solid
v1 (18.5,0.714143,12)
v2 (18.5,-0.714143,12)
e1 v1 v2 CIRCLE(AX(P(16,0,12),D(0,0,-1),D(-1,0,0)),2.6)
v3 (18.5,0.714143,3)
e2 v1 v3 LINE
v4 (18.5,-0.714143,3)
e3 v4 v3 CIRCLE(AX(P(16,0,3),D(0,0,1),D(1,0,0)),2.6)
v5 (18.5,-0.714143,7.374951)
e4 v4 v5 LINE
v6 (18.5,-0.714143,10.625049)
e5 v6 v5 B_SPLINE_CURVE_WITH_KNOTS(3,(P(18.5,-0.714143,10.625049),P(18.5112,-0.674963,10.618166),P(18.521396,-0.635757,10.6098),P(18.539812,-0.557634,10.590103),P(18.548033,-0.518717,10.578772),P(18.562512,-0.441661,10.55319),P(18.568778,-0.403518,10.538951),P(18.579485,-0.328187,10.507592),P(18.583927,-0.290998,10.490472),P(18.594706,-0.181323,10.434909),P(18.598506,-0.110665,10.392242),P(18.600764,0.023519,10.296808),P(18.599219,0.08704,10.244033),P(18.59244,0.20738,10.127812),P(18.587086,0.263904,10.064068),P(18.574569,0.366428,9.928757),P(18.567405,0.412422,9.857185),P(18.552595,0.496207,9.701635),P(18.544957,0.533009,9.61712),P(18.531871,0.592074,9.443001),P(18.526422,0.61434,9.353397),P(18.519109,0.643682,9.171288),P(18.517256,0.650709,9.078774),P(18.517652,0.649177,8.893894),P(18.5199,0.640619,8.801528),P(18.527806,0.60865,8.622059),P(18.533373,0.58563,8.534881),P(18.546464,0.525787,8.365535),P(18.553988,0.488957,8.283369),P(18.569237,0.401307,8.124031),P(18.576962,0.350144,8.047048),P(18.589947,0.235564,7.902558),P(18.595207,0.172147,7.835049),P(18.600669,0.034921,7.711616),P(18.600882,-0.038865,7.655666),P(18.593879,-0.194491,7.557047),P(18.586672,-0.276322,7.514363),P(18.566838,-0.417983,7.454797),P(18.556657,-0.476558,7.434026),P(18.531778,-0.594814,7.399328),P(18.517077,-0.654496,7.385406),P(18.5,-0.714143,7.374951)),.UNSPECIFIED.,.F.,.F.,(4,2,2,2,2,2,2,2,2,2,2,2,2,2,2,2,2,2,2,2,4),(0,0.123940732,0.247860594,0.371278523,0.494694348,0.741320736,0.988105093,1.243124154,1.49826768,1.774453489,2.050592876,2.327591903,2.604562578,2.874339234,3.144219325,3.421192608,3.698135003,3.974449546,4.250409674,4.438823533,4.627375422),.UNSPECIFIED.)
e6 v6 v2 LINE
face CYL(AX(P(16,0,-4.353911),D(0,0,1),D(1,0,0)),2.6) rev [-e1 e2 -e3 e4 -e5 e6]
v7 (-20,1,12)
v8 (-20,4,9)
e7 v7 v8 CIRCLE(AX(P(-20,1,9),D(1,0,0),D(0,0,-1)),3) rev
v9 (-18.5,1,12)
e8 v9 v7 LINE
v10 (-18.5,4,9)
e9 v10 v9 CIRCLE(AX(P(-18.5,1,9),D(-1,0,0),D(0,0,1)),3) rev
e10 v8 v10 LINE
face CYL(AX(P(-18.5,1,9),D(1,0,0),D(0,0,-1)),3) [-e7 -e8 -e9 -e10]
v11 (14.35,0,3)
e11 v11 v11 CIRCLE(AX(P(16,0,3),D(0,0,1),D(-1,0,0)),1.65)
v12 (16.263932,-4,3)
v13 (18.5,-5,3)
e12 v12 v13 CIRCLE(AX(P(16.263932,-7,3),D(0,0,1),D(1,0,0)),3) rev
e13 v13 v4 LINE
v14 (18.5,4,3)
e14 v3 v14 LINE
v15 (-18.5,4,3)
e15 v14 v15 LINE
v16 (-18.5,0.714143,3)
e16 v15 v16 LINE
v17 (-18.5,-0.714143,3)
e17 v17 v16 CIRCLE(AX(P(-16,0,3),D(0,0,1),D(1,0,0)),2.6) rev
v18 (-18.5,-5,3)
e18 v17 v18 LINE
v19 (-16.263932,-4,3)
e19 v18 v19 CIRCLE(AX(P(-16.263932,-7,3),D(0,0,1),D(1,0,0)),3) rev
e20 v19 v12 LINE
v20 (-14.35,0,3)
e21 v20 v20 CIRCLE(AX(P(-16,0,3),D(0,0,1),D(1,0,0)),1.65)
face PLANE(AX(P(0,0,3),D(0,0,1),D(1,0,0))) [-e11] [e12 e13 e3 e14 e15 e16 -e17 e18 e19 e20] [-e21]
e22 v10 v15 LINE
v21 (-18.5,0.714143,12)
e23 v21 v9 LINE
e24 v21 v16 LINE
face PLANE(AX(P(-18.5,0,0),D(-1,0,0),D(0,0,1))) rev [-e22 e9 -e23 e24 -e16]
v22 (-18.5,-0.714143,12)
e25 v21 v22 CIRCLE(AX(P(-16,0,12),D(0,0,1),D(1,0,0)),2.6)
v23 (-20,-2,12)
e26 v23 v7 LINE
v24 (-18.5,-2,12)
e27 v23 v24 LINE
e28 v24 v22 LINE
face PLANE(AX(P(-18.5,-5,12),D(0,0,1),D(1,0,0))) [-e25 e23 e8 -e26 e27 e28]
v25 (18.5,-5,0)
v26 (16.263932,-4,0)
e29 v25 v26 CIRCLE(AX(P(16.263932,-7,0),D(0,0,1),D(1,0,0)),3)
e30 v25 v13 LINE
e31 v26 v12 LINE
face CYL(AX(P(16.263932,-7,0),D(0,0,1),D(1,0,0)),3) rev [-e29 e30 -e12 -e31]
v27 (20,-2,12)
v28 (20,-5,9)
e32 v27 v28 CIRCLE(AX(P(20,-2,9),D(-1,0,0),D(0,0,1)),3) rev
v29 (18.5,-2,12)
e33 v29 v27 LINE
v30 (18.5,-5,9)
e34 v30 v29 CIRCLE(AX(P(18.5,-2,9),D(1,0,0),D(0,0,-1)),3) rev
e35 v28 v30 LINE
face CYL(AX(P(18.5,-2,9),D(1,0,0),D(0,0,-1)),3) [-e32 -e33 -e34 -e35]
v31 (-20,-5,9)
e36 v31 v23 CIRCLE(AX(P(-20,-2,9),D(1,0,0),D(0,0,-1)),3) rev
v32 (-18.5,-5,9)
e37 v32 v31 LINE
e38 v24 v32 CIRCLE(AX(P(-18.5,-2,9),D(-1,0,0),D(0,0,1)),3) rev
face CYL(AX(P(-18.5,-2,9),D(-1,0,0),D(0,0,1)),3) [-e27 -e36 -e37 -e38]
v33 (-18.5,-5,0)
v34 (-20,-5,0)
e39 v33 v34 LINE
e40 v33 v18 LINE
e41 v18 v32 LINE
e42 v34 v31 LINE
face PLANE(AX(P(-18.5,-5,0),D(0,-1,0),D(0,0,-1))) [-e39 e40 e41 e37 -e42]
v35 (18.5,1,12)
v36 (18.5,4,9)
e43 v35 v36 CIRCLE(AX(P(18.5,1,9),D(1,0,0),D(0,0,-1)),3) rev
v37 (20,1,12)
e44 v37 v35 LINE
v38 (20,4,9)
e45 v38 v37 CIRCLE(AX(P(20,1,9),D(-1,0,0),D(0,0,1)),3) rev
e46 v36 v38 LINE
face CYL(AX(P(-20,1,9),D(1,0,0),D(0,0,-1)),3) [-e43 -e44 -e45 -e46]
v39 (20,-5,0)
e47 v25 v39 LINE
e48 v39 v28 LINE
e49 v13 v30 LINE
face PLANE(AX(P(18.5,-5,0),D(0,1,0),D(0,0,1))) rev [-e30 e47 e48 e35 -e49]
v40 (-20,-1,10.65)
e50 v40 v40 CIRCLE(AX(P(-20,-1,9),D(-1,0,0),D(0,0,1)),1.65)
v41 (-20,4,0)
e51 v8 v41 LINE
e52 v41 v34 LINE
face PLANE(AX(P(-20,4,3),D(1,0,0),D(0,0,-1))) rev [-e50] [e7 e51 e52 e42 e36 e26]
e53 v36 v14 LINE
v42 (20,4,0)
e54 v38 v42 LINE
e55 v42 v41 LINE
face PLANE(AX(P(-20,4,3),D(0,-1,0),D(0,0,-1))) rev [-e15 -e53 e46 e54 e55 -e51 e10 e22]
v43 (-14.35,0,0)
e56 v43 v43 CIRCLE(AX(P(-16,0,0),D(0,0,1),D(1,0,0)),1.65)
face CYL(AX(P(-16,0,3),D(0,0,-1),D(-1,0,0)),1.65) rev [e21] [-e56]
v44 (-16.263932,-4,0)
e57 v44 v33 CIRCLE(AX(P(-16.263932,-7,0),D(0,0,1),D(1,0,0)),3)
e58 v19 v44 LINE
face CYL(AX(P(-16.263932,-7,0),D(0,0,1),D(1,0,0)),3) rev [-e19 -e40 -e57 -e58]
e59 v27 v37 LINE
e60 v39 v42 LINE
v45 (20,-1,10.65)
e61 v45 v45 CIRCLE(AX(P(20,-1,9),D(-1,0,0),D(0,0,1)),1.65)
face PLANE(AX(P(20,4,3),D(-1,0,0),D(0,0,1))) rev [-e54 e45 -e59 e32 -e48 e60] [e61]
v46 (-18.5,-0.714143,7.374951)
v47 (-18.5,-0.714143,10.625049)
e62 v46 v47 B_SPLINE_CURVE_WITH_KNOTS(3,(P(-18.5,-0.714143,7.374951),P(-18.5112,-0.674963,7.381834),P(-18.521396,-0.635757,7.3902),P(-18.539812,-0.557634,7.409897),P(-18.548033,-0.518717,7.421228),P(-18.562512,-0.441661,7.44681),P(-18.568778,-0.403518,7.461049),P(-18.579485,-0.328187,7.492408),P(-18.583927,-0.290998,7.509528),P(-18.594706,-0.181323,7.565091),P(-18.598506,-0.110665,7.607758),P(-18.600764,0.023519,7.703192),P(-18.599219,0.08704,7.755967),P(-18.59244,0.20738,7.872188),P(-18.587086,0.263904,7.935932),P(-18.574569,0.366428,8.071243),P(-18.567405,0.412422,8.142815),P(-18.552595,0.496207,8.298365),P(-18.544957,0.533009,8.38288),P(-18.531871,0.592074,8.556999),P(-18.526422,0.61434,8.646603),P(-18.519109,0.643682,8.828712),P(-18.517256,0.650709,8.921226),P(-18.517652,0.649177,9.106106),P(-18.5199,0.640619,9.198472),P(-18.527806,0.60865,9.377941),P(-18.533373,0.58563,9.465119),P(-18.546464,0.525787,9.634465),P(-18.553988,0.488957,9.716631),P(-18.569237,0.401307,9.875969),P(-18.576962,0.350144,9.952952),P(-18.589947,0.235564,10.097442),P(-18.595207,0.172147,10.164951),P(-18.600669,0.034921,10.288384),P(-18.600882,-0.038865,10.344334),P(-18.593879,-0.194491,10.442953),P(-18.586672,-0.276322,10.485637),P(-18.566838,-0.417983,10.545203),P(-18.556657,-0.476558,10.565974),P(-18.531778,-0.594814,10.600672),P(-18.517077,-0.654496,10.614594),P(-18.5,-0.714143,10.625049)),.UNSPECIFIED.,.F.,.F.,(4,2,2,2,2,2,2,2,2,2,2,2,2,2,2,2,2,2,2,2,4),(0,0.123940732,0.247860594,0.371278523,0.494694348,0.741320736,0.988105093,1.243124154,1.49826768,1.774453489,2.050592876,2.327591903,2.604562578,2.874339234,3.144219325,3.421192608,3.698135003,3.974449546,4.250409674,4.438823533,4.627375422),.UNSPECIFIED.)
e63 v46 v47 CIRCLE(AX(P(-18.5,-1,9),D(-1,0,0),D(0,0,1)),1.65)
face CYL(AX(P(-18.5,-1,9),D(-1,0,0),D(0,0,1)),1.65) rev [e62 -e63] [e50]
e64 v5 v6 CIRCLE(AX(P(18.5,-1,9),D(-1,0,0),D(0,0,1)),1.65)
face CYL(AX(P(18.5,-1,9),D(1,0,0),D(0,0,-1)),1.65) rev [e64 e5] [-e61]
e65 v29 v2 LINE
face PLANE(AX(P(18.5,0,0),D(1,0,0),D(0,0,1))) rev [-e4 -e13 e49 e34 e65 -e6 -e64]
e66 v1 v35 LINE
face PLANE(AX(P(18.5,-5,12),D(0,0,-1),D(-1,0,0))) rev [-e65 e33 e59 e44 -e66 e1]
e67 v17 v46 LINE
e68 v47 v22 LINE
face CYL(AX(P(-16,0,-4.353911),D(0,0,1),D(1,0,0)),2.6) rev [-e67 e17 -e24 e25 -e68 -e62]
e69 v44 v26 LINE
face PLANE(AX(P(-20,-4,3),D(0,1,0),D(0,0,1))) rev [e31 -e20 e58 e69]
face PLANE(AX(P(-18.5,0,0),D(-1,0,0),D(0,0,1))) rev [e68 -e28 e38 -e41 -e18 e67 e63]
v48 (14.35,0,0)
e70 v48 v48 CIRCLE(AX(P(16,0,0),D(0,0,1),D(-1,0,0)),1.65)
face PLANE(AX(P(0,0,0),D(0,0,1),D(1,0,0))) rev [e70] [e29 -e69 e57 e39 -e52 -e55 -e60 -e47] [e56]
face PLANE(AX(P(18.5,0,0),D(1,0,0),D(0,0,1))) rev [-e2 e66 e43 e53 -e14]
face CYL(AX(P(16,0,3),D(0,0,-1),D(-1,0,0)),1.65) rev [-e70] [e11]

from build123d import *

# Parameters (mm, degrees)
ESBO_O1_W                = 40
ESBO_O1_H                = 8
ESBO_O1_R                = 1.65
RESSALTO_EXTRUS_O1_DEPTH = 3
ESBO_O2_W                = 12
ESBO_O2_H                = 9
ESBO_O2_R                = 1.65
RESSALTO_EXTRUS_O2_DEPTH = 1.5
FILETE2_R                = 3
CORTE_EXTRUS_O1_REACH    = 25.854
ESBO_O3_R                = 2.6
ESPELHAR1_START          = 18.5
ESPELHAR1_OUTLINE_R      = 1.65
ESPELHAR1_DEPTH          = 1.5
ESPELHAR1_START_2        = 16.263932023
ESPELHAR1_2_OUTLINE_W    = 1
ESPELHAR1_2_OUTLINE_H    = 3
ESPELHAR1_2_DEPTH        = 2.236067977
ESPELHAR1_START_3        = -1
ESPELHAR1_3_DEPTH        = 4.84942
ESPELHAR1_START_4        = 3
ESPELHAR1_4_DEPTH        = 10


with BuildPart() as part:
    # Esboço1 → Ressalto-extrusão1 (new body)
    with BuildSketch(Plane.XY):
        Rectangle(ESBO_O1_W, ESBO_O1_H)
        with Locations((-16, 0)):
            Circle(ESBO_O1_R, mode=Mode.SUBTRACT)
        with Locations(Location((16, 0, 0), (0, 0, 180))):
            Circle(ESBO_O1_R, mode=Mode.SUBTRACT)
    extrude(amount=RESSALTO_EXTRUS_O1_DEPTH)

    # Esboço2 → Ressalto-extrusão2 (add)
    with BuildSketch(Plane.ZY.offset(20)):
        with Locations((6, -0.5)):
            Rectangle(ESBO_O2_W, ESBO_O2_H)
        with Locations((9, -1)):
            Circle(ESBO_O2_R, mode=Mode.SUBTRACT)
    extrude(amount=-RESSALTO_EXTRUS_O2_DEPTH)

    # Filete2
    # the kernel refuses this fillet: 3 mm, written as the material it adds along each edge
    with BuildSketch(Plane(origin=(-18.5, -4, 3), x_dir=(1, 0, 0), z_dir=(0, 0, -1))) as filete2_piece_1:
        with BuildLine():
            CenterArc((2.236067977, 3), FILETE2_R, 221.810314896, 48.189685104)
            Line((0, 1), (0, 0))
            Line((0, 0), (2.236067977, 0))
        make_face()
    extrude(amount=3)
    # the kernel refuses this fillet: 3 mm, written as the material it takes off along each edge
    with BuildSketch(Plane(origin=(-27.5, -5, 12), x_dir=(0, 0, -1), z_dir=(1, 0, 0))) as filete2_2_piece_1:
        with BuildLine():
            CenterArc((FILETE2_R, FILETE2_R), FILETE2_R, 180, 90)
            Line((0, FILETE2_R), (0, 0))
            Line((0, 0), (FILETE2_R, 0))
        make_face()
    extrude(amount=16.5, mode=Mode.SUBTRACT)
    with BuildSketch(Plane(origin=(-27.5, 4, 12), x_dir=(0, 0, -1), z_dir=(1, 0, 0))) as filete2_2_piece_2:
        with BuildLine():
            CenterArc((FILETE2_R, -FILETE2_R), FILETE2_R, 90, 90)
            Line((0, -FILETE2_R), (0, 0))
            Line((0, 0), (FILETE2_R, 0))
        make_face()
    extrude(amount=16.5, mode=Mode.SUBTRACT)

    # Corte-extrusão1: up to this face of the body (flat: up to its plane)
    corte_extrus_o1_end = Plane(part.part.faces().sort_by_distance((0.749892581, -0.010110038, 3))[0])
    # Esboço3 → Corte-extrusão1 (cut, up to the picked face)
    with BuildSketch(Plane.XY.offset(12), mode=Mode.PRIVATE) as corte_extrus_o1_sk1:
        with Locations((-16, 0)):
            Circle(ESBO_O3_R)
    corte_extrus_o1_tool1 = split(extrude(corte_extrus_o1_sk1.sketch, amount=-CORTE_EXTRUS_O1_REACH, mode=Mode.PRIVATE), bisect_by=corte_extrus_o1_end, keep=Keep.BOTH, mode=Mode.PRIVATE)
    add(corte_extrus_o1_tool1.solids().sort_by(Axis((-16, 0, 12), (0, 0, -1)))[0], mode=Mode.SUBTRACT)

    # Espelhar1: read off the stored shape, not the designer's step
    # Espelhar1 outline → Espelhar1 (add)
    with BuildSketch(Plane.YZ.offset(ESPELHAR1_START)):
        with BuildLine():
            Line((1, 12), (-2, 12))
            ThreePointArc((-2, 12), (-4.121320344, 11.121320344), (-5, 9))
            Line((-5, 9), (-5, 0))
            Line((-5, 0), (-4, 0))
            Line((-4, 0), (-4, 3))
            Line((-4, 3), (4, 3))
            Line((4, 3), (4, 9))
            ThreePointArc((4, 9), (3.121320344, 11.121320344), (1, 12))
        make_face()
        with Locations((-1, 9)):
            Circle(ESPELHAR1_OUTLINE_R, mode=Mode.SUBTRACT)
    extrude(amount=ESPELHAR1_DEPTH)

    # Espelhar1 2 outline → Espelhar1 2 (add)
    with BuildSketch(Plane.YZ.offset(ESPELHAR1_START_2)):
        with Locations((-4.5, 1.5)):
            Rectangle(ESPELHAR1_2_OUTLINE_W, ESPELHAR1_2_OUTLINE_H)
    extrude(amount=ESPELHAR1_2_DEPTH)

    # Espelhar1 3 outline → Espelhar1 3 (cut)
    with BuildSketch(Plane.XY.offset(ESPELHAR1_START_3)):
        with BuildLine():
            Line((16.263932023, -5), (18.5, -5))
            ThreePointArc((18.5, -5), (17.488676894, -4.261387212), (16.263932023, -4))
            Line((16.263932023, -4), (16.263932023, -5))
        make_face()
    extrude(amount=ESPELHAR1_3_DEPTH, mode=Mode.SUBTRACT)

    # Espelhar1 4 outline → Espelhar1 4 (cut)
    with BuildSketch(Plane.XY.offset(ESPELHAR1_START_4)):
        with BuildLine():
            Line((18.5, 0.714142843), (18.5, -0.714142843))
            ThreePointArc((18.5, -0.714142843), (18.6, 0), (18.5, 0.714142843))
        make_face()
    extrude(amount=ESPELHAR1_4_DEPTH, mode=Mode.SUBTRACT)


solid = part.part
